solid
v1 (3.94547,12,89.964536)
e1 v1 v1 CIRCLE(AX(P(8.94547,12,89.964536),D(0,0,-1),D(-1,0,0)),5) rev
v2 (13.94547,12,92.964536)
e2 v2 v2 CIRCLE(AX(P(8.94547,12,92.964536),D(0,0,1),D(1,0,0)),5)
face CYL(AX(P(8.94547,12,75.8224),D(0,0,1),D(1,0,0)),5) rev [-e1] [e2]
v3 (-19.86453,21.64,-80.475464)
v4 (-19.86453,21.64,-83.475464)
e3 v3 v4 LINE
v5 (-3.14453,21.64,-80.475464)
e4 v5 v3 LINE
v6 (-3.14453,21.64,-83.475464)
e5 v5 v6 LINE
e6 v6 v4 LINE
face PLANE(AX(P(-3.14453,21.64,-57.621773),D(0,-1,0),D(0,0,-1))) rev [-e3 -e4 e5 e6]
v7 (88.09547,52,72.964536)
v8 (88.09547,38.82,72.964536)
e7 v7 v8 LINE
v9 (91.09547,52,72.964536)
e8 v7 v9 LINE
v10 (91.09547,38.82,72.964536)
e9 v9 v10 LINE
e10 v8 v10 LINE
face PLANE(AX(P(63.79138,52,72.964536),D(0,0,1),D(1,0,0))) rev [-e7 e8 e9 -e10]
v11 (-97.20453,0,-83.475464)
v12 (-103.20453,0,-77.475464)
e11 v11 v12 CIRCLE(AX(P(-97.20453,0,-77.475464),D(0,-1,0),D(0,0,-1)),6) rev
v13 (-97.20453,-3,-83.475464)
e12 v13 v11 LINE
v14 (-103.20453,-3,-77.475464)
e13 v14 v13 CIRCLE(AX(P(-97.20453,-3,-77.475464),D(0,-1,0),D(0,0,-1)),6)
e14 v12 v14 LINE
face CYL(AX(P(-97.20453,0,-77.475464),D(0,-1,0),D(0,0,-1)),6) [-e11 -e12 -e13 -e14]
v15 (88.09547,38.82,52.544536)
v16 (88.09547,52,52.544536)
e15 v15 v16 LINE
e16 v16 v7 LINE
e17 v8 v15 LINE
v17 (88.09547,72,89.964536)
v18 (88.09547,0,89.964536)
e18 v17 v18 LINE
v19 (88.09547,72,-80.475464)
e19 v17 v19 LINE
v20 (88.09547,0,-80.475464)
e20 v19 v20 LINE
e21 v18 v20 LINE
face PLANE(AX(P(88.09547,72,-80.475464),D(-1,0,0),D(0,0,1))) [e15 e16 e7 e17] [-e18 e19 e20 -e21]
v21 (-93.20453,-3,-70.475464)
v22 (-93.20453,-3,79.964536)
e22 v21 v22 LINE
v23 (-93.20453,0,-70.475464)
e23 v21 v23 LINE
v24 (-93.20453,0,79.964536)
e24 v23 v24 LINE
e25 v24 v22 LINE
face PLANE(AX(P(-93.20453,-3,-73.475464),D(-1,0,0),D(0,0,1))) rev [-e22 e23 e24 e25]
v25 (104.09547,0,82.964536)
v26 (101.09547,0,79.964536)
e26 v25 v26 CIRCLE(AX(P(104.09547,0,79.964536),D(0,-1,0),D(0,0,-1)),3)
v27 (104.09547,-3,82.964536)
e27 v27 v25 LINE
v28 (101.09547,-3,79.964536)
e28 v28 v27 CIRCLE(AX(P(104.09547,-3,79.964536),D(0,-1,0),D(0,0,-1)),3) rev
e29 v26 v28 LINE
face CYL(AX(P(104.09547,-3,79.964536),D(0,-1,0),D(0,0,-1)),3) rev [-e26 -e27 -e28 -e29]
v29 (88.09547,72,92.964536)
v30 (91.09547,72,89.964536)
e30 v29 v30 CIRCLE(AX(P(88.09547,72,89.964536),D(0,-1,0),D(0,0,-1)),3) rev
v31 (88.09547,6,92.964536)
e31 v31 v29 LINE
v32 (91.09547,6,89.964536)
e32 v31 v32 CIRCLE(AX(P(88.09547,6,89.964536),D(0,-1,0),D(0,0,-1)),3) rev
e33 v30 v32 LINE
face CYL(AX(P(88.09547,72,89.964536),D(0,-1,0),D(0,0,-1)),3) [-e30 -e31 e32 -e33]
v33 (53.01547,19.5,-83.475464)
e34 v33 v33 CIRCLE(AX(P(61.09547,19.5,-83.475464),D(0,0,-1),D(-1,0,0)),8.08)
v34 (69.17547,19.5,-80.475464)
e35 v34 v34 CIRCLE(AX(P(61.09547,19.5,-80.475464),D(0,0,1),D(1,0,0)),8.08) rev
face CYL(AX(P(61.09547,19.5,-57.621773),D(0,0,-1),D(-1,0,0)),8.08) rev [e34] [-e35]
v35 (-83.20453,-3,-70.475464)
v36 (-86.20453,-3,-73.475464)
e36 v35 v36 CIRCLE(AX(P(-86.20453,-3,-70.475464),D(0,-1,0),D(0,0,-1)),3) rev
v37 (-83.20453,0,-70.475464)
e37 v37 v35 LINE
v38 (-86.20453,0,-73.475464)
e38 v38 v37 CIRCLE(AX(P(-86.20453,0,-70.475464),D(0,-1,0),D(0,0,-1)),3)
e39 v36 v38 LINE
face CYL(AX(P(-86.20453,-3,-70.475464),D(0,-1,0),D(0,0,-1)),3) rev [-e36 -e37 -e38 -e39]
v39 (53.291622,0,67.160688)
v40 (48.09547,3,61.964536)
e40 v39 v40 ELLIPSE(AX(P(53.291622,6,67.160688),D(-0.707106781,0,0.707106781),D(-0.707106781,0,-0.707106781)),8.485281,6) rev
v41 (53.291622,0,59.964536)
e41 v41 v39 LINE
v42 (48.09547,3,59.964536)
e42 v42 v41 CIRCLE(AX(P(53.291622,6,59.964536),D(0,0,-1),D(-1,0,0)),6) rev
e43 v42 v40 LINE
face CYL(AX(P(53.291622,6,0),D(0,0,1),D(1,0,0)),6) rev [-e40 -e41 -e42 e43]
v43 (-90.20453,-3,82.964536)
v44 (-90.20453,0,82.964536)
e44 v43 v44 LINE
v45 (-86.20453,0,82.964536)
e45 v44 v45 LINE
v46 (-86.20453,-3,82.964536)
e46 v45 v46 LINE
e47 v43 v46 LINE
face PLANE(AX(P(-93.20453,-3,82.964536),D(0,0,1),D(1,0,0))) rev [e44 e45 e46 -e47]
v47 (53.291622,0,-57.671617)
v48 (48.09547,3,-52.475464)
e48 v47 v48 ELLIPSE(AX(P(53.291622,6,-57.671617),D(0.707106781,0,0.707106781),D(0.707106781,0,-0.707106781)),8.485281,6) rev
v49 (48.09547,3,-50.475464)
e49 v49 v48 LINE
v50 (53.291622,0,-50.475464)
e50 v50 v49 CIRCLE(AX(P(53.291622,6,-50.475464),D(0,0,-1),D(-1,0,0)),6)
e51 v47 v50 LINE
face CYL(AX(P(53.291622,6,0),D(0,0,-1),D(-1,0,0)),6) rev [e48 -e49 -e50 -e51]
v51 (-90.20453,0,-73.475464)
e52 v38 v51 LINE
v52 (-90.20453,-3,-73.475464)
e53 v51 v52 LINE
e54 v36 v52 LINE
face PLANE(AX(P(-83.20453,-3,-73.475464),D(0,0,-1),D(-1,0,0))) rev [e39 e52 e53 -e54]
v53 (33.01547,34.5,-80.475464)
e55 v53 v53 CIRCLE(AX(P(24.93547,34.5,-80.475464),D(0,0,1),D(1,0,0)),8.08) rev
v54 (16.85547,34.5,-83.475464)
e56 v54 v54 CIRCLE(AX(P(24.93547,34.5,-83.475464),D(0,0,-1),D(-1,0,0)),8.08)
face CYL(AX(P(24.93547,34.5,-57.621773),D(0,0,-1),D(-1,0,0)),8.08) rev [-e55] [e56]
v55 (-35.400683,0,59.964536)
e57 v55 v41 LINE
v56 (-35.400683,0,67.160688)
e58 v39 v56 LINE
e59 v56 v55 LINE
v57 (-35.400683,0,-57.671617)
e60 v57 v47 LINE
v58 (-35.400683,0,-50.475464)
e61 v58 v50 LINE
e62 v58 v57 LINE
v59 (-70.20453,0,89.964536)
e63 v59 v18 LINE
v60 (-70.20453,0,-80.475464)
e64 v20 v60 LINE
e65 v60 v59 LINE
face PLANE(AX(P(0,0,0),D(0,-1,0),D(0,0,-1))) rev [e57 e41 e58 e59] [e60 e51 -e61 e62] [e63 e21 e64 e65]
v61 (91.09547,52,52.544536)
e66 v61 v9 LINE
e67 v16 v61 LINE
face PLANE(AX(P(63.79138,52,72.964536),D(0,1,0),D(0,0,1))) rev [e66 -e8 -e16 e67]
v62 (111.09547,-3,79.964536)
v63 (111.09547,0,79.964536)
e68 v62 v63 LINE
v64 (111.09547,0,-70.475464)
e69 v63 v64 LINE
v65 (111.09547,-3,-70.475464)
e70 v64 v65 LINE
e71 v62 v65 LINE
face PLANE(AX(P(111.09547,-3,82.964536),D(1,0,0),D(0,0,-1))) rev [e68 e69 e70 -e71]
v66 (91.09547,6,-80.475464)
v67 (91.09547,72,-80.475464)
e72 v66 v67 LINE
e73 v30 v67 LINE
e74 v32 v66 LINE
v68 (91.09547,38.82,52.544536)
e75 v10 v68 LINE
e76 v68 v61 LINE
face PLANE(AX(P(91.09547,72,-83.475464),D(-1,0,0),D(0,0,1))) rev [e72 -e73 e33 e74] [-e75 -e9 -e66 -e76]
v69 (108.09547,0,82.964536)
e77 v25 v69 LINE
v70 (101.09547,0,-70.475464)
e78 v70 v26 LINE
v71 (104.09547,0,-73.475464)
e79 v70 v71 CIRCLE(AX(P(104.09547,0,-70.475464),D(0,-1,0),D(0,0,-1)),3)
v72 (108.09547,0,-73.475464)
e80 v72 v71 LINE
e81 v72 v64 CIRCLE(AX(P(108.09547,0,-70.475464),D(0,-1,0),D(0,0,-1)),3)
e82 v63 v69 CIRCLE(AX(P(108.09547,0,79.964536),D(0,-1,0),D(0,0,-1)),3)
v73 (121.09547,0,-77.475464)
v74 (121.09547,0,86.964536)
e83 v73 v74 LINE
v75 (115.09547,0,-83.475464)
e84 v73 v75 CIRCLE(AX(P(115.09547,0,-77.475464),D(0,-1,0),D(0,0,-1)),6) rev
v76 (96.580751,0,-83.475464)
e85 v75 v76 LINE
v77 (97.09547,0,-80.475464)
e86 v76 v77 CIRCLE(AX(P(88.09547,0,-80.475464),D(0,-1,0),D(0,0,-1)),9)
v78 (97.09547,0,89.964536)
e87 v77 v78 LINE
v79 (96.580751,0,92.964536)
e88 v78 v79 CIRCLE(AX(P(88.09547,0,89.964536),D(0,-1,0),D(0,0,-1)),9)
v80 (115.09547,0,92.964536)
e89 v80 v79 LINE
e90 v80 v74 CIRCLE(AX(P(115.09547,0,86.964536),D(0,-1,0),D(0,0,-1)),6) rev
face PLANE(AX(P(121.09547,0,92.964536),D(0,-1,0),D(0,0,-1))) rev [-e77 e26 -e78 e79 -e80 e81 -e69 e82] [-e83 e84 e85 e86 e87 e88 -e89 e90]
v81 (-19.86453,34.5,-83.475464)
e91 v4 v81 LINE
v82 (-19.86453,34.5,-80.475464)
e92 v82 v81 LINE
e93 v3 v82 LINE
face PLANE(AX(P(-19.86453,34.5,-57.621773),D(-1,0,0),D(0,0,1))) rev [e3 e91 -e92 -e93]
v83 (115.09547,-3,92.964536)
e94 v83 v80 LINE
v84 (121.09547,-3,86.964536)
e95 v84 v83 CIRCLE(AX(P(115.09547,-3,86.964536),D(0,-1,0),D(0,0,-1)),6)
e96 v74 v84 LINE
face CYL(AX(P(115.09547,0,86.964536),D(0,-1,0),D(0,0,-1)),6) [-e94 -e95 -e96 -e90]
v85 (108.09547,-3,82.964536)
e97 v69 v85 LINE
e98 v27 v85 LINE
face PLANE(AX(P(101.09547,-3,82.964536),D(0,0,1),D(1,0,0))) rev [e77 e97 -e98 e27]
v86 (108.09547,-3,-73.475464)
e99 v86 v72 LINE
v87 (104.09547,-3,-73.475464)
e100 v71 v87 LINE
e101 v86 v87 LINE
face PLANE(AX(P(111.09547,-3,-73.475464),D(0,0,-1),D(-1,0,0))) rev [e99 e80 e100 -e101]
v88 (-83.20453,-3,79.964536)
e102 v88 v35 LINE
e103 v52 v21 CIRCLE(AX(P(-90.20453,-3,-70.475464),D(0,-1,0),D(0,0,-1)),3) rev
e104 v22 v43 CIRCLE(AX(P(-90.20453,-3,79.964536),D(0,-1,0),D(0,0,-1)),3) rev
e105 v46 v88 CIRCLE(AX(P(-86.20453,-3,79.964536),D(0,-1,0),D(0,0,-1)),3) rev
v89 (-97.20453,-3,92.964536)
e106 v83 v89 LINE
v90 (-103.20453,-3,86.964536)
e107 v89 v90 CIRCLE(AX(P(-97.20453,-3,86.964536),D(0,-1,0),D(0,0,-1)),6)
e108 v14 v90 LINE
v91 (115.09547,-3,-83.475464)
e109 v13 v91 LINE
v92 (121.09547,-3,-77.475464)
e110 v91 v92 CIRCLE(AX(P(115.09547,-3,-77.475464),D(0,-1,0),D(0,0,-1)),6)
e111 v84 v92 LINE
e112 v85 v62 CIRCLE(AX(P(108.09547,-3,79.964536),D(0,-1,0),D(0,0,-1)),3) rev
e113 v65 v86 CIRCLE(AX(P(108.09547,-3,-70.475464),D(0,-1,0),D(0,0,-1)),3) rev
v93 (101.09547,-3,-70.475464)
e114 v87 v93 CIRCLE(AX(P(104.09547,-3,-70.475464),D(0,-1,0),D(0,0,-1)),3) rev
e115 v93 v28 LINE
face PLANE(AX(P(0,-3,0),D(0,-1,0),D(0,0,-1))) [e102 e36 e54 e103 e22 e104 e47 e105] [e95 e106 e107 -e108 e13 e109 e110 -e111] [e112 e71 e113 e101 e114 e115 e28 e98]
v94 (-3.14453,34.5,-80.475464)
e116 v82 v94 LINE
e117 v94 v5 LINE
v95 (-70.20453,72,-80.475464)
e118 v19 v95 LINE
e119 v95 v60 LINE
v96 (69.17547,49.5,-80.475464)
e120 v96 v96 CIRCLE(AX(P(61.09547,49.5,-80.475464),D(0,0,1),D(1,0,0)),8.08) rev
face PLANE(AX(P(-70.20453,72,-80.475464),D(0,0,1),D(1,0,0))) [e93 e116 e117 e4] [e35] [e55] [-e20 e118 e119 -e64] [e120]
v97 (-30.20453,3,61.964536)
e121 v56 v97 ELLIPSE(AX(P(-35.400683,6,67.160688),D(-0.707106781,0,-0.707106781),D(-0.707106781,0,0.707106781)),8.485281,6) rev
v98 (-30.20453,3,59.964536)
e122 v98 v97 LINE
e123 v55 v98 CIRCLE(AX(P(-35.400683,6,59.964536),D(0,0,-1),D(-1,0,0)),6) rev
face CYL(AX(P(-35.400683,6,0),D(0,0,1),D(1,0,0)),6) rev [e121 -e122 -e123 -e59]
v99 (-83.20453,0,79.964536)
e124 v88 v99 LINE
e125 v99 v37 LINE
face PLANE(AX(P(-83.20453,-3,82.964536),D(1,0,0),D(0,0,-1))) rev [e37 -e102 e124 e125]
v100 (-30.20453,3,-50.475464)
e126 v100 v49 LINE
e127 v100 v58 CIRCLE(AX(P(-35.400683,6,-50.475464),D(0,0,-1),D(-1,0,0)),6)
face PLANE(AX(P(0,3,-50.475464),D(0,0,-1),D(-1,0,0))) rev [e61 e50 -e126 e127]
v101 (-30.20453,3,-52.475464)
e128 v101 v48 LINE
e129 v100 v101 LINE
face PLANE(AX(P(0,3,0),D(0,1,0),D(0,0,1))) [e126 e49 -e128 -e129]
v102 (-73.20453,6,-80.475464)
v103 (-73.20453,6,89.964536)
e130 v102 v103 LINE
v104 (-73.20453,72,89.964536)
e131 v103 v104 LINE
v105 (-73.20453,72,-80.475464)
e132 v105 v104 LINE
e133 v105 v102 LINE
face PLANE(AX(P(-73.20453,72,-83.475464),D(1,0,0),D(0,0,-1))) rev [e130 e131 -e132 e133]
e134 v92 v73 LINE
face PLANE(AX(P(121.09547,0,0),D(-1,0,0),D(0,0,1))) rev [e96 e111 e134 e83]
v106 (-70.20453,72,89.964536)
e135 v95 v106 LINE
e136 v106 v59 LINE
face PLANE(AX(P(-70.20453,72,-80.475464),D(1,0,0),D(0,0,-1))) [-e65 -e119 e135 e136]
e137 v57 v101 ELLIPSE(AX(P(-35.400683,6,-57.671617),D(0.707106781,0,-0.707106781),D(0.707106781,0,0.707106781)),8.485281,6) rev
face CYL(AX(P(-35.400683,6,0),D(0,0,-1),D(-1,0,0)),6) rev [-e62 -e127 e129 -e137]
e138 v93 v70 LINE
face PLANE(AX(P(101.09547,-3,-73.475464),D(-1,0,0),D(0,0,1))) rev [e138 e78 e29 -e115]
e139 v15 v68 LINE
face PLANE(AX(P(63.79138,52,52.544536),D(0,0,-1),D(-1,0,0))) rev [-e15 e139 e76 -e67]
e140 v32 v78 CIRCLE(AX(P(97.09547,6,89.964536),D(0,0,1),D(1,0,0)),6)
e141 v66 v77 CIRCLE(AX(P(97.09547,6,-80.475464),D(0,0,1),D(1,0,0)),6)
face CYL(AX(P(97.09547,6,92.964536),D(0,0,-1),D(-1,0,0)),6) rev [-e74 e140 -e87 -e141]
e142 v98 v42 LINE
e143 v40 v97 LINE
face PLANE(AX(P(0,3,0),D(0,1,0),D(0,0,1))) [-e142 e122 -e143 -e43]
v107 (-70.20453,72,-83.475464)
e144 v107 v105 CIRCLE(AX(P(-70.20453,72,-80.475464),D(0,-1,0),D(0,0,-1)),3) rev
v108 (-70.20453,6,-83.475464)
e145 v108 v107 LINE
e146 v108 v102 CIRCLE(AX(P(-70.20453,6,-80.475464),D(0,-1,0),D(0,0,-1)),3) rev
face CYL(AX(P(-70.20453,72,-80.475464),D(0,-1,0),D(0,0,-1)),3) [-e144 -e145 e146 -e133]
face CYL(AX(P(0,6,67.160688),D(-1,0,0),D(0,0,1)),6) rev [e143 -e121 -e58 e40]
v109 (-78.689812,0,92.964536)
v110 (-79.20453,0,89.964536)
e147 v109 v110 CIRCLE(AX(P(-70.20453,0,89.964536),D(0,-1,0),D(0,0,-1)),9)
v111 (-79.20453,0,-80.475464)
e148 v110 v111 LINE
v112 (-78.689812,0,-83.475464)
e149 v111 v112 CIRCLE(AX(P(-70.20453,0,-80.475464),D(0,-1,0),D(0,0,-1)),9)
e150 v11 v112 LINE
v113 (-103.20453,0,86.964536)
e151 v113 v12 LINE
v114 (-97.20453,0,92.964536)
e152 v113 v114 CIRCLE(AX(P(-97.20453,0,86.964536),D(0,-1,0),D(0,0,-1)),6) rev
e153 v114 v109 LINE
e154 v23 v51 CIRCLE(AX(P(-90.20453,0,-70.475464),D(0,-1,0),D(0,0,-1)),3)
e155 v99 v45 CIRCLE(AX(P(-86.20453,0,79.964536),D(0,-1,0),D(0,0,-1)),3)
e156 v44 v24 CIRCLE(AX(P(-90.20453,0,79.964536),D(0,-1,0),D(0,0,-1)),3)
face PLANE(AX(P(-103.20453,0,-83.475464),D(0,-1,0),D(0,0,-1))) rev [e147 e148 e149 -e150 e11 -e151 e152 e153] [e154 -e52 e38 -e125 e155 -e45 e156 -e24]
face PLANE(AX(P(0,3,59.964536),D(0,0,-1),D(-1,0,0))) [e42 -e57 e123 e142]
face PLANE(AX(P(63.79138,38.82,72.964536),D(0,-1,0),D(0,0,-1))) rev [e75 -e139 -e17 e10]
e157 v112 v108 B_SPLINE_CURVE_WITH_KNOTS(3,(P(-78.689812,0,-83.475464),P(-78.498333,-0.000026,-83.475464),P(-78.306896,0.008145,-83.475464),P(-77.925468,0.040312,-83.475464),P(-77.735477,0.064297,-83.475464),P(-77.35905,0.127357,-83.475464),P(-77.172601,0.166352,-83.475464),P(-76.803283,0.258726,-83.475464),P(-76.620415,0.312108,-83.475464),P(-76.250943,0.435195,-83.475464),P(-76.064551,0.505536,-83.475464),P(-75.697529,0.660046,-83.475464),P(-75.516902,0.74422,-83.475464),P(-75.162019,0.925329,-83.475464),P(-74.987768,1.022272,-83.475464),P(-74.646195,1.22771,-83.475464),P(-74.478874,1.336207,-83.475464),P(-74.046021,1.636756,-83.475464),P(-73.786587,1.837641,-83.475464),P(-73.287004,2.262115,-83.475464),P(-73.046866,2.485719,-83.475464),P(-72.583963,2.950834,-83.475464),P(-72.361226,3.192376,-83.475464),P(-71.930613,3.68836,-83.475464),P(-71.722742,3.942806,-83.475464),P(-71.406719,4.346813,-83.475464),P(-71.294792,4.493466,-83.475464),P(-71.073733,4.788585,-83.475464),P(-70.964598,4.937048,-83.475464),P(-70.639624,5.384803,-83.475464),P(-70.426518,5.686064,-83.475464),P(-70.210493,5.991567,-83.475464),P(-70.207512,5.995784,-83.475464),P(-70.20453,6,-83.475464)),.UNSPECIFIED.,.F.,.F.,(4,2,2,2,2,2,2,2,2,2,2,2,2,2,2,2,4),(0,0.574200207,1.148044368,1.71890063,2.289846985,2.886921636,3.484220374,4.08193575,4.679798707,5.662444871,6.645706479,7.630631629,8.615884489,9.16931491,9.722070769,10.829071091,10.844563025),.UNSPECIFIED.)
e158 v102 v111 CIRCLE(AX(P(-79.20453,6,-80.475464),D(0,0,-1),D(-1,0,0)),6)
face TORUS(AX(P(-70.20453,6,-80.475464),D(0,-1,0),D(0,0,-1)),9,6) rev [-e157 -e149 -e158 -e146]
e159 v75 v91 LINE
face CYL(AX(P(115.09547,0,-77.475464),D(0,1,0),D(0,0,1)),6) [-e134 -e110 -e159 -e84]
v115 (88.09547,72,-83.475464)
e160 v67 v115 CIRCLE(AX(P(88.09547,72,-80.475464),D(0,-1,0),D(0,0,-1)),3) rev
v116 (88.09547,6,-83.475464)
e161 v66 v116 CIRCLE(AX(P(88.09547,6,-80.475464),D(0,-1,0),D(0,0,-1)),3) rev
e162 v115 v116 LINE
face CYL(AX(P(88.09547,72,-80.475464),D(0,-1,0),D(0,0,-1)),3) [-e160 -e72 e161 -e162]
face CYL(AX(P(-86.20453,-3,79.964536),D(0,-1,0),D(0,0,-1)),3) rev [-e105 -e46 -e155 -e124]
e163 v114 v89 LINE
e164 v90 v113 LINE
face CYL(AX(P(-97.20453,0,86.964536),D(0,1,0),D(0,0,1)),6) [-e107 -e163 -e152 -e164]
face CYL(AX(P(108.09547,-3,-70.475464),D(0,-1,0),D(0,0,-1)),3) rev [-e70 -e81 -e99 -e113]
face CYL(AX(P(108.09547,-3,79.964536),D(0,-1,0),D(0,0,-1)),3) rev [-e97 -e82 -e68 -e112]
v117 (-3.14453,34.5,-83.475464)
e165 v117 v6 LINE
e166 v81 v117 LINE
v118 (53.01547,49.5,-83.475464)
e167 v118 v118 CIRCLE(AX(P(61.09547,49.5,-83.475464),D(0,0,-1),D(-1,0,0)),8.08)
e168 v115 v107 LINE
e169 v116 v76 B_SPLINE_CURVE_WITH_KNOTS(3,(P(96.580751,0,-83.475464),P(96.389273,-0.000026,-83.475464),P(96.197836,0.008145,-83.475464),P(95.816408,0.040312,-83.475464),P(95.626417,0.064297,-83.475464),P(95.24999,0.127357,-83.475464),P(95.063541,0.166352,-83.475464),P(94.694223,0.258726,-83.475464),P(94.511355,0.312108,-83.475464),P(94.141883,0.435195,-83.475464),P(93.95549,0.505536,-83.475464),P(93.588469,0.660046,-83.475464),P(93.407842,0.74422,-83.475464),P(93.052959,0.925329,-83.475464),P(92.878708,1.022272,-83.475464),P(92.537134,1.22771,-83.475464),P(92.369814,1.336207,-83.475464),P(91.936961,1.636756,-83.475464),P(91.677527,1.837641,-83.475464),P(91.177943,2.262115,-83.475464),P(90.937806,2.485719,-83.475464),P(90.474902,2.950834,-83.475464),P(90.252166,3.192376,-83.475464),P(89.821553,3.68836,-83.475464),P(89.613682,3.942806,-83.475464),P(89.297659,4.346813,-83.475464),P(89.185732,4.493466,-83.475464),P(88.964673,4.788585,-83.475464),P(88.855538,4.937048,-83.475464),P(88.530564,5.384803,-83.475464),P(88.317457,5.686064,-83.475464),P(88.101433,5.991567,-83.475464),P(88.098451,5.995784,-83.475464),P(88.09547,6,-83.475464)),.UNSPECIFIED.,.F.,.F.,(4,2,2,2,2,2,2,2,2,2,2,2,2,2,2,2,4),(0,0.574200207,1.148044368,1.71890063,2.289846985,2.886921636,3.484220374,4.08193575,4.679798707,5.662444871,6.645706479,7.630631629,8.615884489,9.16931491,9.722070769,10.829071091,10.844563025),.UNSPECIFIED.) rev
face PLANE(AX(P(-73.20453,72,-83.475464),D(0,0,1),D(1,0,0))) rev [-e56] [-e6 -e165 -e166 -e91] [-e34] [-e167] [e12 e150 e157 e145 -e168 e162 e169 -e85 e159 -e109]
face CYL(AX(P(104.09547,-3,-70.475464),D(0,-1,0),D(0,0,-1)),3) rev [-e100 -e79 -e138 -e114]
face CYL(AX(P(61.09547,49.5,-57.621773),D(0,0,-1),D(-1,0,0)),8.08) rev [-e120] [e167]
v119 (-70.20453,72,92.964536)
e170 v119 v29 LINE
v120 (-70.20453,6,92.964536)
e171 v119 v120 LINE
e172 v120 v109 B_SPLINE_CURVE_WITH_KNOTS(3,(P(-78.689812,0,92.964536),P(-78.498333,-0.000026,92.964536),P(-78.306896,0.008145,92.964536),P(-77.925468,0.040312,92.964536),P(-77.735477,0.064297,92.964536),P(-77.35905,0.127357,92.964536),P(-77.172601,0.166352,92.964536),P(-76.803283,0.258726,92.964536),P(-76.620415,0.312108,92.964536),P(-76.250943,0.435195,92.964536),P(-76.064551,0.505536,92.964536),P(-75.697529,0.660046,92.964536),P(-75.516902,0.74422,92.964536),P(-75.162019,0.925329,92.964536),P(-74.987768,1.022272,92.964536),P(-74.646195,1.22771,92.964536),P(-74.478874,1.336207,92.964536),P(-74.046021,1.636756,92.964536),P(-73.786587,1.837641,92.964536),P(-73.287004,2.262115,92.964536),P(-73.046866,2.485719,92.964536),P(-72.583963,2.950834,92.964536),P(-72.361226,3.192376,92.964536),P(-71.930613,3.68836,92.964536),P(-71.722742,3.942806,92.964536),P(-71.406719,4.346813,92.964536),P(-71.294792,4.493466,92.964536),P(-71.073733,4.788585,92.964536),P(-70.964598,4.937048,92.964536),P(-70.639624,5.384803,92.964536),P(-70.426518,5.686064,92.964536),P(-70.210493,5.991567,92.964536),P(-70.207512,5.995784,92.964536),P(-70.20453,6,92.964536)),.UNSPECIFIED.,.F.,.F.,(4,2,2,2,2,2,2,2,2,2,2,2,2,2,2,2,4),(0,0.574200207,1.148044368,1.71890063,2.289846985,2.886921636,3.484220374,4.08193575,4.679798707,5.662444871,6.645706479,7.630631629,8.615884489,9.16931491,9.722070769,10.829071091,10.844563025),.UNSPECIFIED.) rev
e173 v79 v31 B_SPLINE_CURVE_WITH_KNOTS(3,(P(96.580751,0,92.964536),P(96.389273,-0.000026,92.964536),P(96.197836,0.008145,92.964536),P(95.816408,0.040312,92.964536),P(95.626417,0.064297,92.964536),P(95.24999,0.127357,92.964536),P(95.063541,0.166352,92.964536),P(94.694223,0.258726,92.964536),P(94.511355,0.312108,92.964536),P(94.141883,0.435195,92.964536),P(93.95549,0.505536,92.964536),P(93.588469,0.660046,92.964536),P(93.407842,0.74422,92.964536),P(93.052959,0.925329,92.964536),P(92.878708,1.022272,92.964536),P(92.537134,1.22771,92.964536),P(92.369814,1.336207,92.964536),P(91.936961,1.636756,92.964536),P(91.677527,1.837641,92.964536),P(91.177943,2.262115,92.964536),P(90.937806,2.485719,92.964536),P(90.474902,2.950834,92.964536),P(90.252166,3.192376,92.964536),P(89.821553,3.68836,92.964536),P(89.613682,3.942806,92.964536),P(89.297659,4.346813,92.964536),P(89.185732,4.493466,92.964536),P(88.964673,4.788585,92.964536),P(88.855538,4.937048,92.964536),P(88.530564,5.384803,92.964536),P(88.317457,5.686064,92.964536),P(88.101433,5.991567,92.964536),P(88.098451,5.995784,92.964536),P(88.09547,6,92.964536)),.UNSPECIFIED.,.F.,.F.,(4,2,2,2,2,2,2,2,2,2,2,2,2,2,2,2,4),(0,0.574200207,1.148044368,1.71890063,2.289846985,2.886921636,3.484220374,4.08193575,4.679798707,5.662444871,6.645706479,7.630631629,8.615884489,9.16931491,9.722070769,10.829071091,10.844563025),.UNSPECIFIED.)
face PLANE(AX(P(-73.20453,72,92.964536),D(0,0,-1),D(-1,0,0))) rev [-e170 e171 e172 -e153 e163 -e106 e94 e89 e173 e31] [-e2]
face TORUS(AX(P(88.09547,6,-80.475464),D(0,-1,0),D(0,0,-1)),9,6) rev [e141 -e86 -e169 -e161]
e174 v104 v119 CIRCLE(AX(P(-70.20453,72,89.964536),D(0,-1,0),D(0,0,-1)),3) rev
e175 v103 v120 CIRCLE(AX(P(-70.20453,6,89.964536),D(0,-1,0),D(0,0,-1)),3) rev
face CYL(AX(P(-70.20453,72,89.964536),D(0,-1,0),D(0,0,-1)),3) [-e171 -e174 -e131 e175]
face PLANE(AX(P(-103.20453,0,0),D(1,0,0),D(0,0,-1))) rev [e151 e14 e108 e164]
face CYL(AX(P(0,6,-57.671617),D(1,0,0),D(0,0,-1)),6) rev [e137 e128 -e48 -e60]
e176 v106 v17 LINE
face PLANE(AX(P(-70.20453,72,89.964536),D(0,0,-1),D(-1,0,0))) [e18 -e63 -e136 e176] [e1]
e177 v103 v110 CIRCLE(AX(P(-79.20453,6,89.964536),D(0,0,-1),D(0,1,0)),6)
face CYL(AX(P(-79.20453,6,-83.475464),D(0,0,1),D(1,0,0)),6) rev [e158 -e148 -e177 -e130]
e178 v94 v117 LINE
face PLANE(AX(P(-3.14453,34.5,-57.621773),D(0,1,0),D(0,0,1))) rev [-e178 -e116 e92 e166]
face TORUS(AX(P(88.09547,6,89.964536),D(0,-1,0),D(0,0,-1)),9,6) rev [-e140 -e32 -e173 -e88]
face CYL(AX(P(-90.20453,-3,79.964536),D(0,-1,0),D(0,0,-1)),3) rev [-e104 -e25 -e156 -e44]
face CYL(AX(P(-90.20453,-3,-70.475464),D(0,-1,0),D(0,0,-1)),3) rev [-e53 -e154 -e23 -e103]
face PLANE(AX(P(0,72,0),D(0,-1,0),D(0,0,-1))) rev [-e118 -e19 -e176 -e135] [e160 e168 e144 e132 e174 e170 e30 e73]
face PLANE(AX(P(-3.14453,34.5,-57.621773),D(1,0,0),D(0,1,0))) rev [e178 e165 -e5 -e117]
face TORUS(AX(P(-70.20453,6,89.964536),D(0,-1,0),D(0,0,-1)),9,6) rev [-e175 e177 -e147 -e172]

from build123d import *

# Parameters (mm, degrees)
SKETCH1_W           = 164.3
SKETCH1_H           = 176.44
SKETCH1_W_2         = 158.3
SKETCH1_H_2         = 170.44
BOSS_EXTRUDE1_DEPTH = 72
SKETCH2_W           = 164.3
SKETCH2_H           = 176.44
BOSS_EXTRUDE2_DEPTH = 3
SKETCH3_R           = 8.08
SKETCH3_W           = 16.72
SKETCH3_H           = 12.86
CUT_EXTRUDE1_DEPTH  = 3
SKETCH4_W           = 20.42
SKETCH4_H           = 13.18
CUT_EXTRUDE2_DEPTH  = 3
SKETCH5_R           = 5
CUT_EXTRUDE3_DEPTH  = 3
SKETCH6_W           = 176.44
SKETCH6_H           = 3
BOSS_EXTRUDE3_DEPTH = 30
SKETCH7_W           = 176.44
SKETCH7_H           = 3
BOSS_EXTRUDE4_DEPTH = 30
SKETCH9_W           = 10
SKETCH9_H           = 156.44
CUT_EXTRUDE4_DEPTH  = 169.791343641
SKETCH10_W          = 10
SKETCH10_H          = 156.44
CUT_EXTRUDE5_DEPTH  = 169.791343641
FILLET1_R           = 3
FILLET2_R           = 6
SKETCH11_W          = 78.3
SKETCH11_H          = 2
BOSS_EXTRUDE5_DEPTH = 3
FILLET3_R           = 6


with BuildPart() as part:
    # Sketch1 → Boss-Extrude1 (new body)
    with BuildSketch(Plane(origin=(0, 0, 0), x_dir=(1, 0, 0), z_dir=(0, 1, 0))):
        with Locations((8.94546986, -4.744535538)):
            Rectangle(SKETCH1_W, SKETCH1_H)
        with Locations((8.94546986, -4.744535538)):
            Rectangle(SKETCH1_W_2, SKETCH1_H_2, mode=Mode.SUBTRACT)
    extrude(amount=BOSS_EXTRUDE1_DEPTH)

    # Sketch2 → Boss-Extrude2 (add)
    with BuildSketch(Plane.XZ):
        with Locations((8.94546986, 4.744535538)):
            Rectangle(SKETCH2_W, SKETCH2_H)
    extrude(amount=BOSS_EXTRUDE2_DEPTH)

    # Sketch3 → Cut-Extrude1 (cut)
    with BuildSketch(Plane(origin=(0, 0, -83.475464462), x_dir=(-1, 0, 0), z_dir=(0, 0, -1))):
        with Locations((-61.09546986, 49.5)):
            Circle(SKETCH3_R)
        with Locations((-61.09546986, 19.5)):
            Circle(SKETCH3_R)
        with Locations((-24.93546986, 34.5)):
            Circle(SKETCH3_R)
        with Locations((11.50453014, 28.07)):
            Rectangle(SKETCH3_W, SKETCH3_H)
    extrude(amount=-CUT_EXTRUDE1_DEPTH, mode=Mode.SUBTRACT)

    # Sketch4 → Cut-Extrude2 (cut)
    with BuildSketch(Plane(origin=(91.09546986, 0, 0), x_dir=(0, 0, -1), z_dir=(1, 0, 0))):
        with Locations((-62.754535538, 45.41)):
            Rectangle(SKETCH4_W, SKETCH4_H)
    extrude(amount=-CUT_EXTRUDE2_DEPTH, mode=Mode.SUBTRACT)

    # Sketch5 → Cut-Extrude3 (cut)
    with BuildSketch(Plane.XY.offset(92.964535538)):
        with Locations((8.94546986, 12)):
            Circle(SKETCH5_R)
    extrude(amount=-CUT_EXTRUDE3_DEPTH, mode=Mode.SUBTRACT)

    # Sketch6 → Boss-Extrude3 (add)
    with BuildSketch(Plane.ZY.offset(73.20453014)):
        with Locations((4.744535538, -1.5)):
            Rectangle(SKETCH6_W, SKETCH6_H)
    extrude(amount=BOSS_EXTRUDE3_DEPTH)

    # Sketch7 → Boss-Extrude4 (add)
    with BuildSketch(Plane(origin=(91.09546986, 0, 0), x_dir=(0, 0, -1), z_dir=(1, 0, 0))):
        with Locations((-4.744535538, -1.5)):
            Rectangle(SKETCH7_W, SKETCH7_H)
    extrude(amount=BOSS_EXTRUDE4_DEPTH)

    # Sketch9 → Cut-Extrude4 (cut, through all)
    with BuildSketch(Plane(origin=(0, 0, 0), x_dir=(1, 0, 0), z_dir=(0, 1, 0))):
        with Locations((-88.20453014, -4.744535538)):
            Rectangle(SKETCH9_W, SKETCH9_H)
    extrude(amount=-CUT_EXTRUDE4_DEPTH, mode=Mode.SUBTRACT)

    # Sketch10 → Cut-Extrude5 (cut, through all)
    with BuildSketch(Plane(origin=(0, 0, 0), x_dir=(1, 0, 0), z_dir=(0, 1, 0))):
        with Locations((106.09546986, -4.744535538)):
            Rectangle(SKETCH10_W, SKETCH10_H)
    extrude(amount=-CUT_EXTRUDE5_DEPTH, mode=Mode.SUBTRACT)

    # Fillet1
    fillet1_edges = [part.edges().sort_by_distance(p)[0] for p in [
        (-83.20453014, -1.5, 82.964535538),
        (-93.20453014, -1.5, 82.964535538),
        (-93.20453014, -1.5, -73.475464462),
        (-83.20453014, -1.5, -73.475464462),
        (101.09546986, -1.5, -73.475464462),
        (111.09546986, -1.5, -73.475464462),
        (111.09546986, -1.5, 82.964535538),
        (101.09546986, -1.5, 82.964535538),
        (91.09546986, 36, -83.475464462),
        (91.09546986, 36, 92.964535538),
        (-73.20453014, 36, 92.964535538),
        (-73.20453014, 36, -83.475464462),
    ]]
    fillet(fillet1_edges, radius=FILLET1_R)

    # Fillet2
    # the kernel refuses this fillet: 6 mm, written as the material it adds along each edge
    with BuildSketch(Plane(origin=(-73.20453014, 0, 89.964535538), x_dir=(0, 1, 0), z_dir=(0, 0, -1)), Plane(origin=(91.09546986, 0, -80.475464462), x_dir=(0, 1, 0), z_dir=(0, 0, 1))) as fillet2_piece_1:
        with BuildLine():
            CenterArc((FILLET2_R, -FILLET2_R), FILLET2_R, 90, 90)
            Line((0, -FILLET2_R), (0, 0))
            Line((0, 0), (FILLET2_R, 0))
        make_face()
    extrude(amount=170.44)
    with BuildSketch(Plane(origin=(-70.20453014, 0, 89.964535538), x_dir=(-1, 0, 0), z_dir=(0, 0, -1))) as fillet2_piece_2_section:
        with BuildLine():
            CenterArc((3 + FILLET2_R, FILLET2_R), FILLET2_R, 180, 90)
            Line((3 + FILLET2_R, 0), (3, 0))
            Line((3, 0), (3, FILLET2_R))
        make_face()
    fillet2_piece_2 = revolve(axis=Axis((-70.20453014, 0, 89.964535538), (0, 1, 0)), revolution_arc=90, mode=Mode.PRIVATE)
    fillet2_piece_2 = split(fillet2_piece_2, bisect_by=Plane(origin=(-72.485257405, 2.132983428, 92.964535538), z_dir=(0, 0, -1)), keep=Keep.TOP, mode=Mode.PRIVATE)
    add(fillet2_piece_2)
    with BuildSketch(Plane(origin=(88.09546986, 0, 89.964535538), x_dir=(0, 0, 1), z_dir=(-1, 0, 0))) as fillet2_piece_3_section:
        with BuildLine():
            CenterArc((3 + FILLET2_R, FILLET2_R), FILLET2_R, 180, 90)
            Line((3, FILLET2_R), (3, 0))
            Line((3, 0), (3 + FILLET2_R, 0))
        make_face()
    fillet2_piece_3 = revolve(axis=Axis((88.09546986, 0, 89.964535538), (0, 1, 0)), revolution_arc=90, mode=Mode.PRIVATE)
    fillet2_piece_3 = split(fillet2_piece_3, bisect_by=Plane(origin=(90.376197118, 2.132983428, 92.964535538), z_dir=(0, 0, -1)), keep=Keep.TOP, mode=Mode.PRIVATE)
    add(fillet2_piece_3)
    with BuildSketch(Plane(origin=(88.09546986, 0, -80.475464462), x_dir=(0, 0, -1), z_dir=(-1, 0, 0))) as fillet2_piece_4_section:
        with BuildLine():
            CenterArc((3 + FILLET2_R, -FILLET2_R), FILLET2_R, 90, 90)
            Line((3, -FILLET2_R), (3, 0))
            Line((3, 0), (3 + FILLET2_R, 0))
        make_face()
    fillet2_piece_4 = revolve(axis=Axis((88.09546986, 0, -80.475464462), (0, -1, 0)), revolution_arc=90, mode=Mode.PRIVATE)
    fillet2_piece_4 = split(fillet2_piece_4, bisect_by=Plane(origin=(90.376233662, 2.13290724, -83.475464462), z_dir=(0, 0, 1)), keep=Keep.TOP, mode=Mode.PRIVATE)
    add(fillet2_piece_4)
    with BuildSketch(Plane(origin=(-70.20453014, 0, -80.475464462), x_dir=(-1, 0, 0), z_dir=(0, 0, 1))) as fillet2_piece_5_section:
        with BuildLine():
            CenterArc((3 + FILLET2_R, -FILLET2_R), FILLET2_R, 90, 90)
            Line((3 + FILLET2_R, 0), (3, 0))
            Line((3, 0), (3, -FILLET2_R))
        make_face()
    fillet2_piece_5 = revolve(axis=Axis((-70.20453014, 0, -80.475464462), (0, -1, 0)), revolution_arc=90, mode=Mode.PRIVATE)
    fillet2_piece_5 = split(fillet2_piece_5, bisect_by=Plane(origin=(-72.485257393, 2.132983423, -83.475464462), z_dir=(0, 0, 1)), keep=Keep.TOP, mode=Mode.PRIVATE)
    add(fillet2_piece_5)
    # the kernel refuses this fillet: 6 mm, written as the material it takes off along each edge
    with BuildSketch(Plane(origin=(121.09546986, 15, 92.964535538), x_dir=(-1, 0, 0), z_dir=(0, -1, 0)), Plane(origin=(121.09546986, -18, -83.475464462), x_dir=(-1, 0, 0), z_dir=(0, 1, 0)), Plane(origin=(-103.20453014, 15, -83.475464462), x_dir=(1, 0, 0), z_dir=(0, -1, 0)), Plane(origin=(-103.20453014, -18, 92.964535538), x_dir=(1, 0, 0), z_dir=(0, 1, 0))) as fillet2_2_piece_1:
        with BuildLine():
            CenterArc((FILLET2_R, FILLET2_R), FILLET2_R, 180, 90)
            Line((0, FILLET2_R), (0, 0))
            Line((0, 0), (FILLET2_R, 0))
        make_face()
    extrude(amount=33, mode=Mode.SUBTRACT)

    # Sketch11 → Boss-Extrude5 (add)
    with BuildSketch(Plane(origin=(0, 0, 0), x_dir=(1, 0, 0), z_dir=(0, 1, 0))):
        with Locations((8.94546986, 51.475464462)):
            Rectangle(SKETCH11_W, SKETCH11_H)
        with Locations((8.94546986, -60.964535538)):
            Rectangle(SKETCH11_W, SKETCH11_H)
    extrude(amount=BOSS_EXTRUDE5_DEPTH)

    # Fillet3
    # the kernel refuses this fillet: 6 mm, written as the material it adds along each edge
    with BuildSketch(Plane(origin=(48.09546986, 0, 61.964535538), x_dir=(0, 0, 1), z_dir=(-1, 0, 0))) as fillet3_piece_1:
        with BuildLine():
            CenterArc((5.196152423, 6), FILLET3_R, 210, 60)
            Line((0, 3), (-0.103923048, 2.94))
            ThreePointArc((-0.103923048, 2.94), (-0.12, 1.5), (-0.12, 0))
            Line((-0.12, 0), (0, -0.12))
            Line((0, -0.12), (5.196152423, -0.12))
            Line((5.196152423, -0.12), (5.196152423, 0))
        make_face()
    extrude(amount=78.3)
    with BuildSketch(Plane(origin=(48.09546986, 0, -52.475464462), x_dir=(0, 0, -1), z_dir=(-1, 0, 0))) as fillet3_piece_2:
        with BuildLine():
            CenterArc((5.196152423, -6), FILLET3_R, 90, 60)
            Line((0, -3), (-0.103923048, -2.94))
            ThreePointArc((-0.103923048, -2.94), (-0.12, -1.5), (-0.12, 0))
            Line((-0.12, 0), (0, 0.12))
            Line((0, 0.12), (5.196152423, 0.12))
            Line((5.196152423, 0.12), (5.196152423, 0))
        make_face()
    extrude(amount=78.3)
    with BuildSketch(Plane(origin=(-30.20453014, 0, 61.964535538), x_dir=(-1, 0, 0), z_dir=(0, 0, -1)), Plane(origin=(48.09546986, 0, 59.964535538), x_dir=(1, 0, 0), z_dir=(0, 0, 1))) as fillet3_piece_3:
        with BuildLine():
            CenterArc((5.196152423, 6), FILLET3_R, 210, 60)
            Line((0, 3), (-0.103923048, 2.94))
            ThreePointArc((-0.103923048, 2.94), (-0.12, 1.5), (-0.12, 0))
            Line((-0.12, 0), (0, -0.12))
            Line((0, -0.12), (5.196152423, -0.12))
            Line((5.196152423, -0.12), (5.196152423, 0))
        make_face()
    extrude(amount=2)
    with BuildSketch(Plane(origin=(48.09546986, 0, -50.475464462), x_dir=(1, 0, 0), z_dir=(0, 0, -1)), Plane(origin=(-30.20453014, 0, -52.475464462), x_dir=(-1, 0, 0), z_dir=(0, 0, 1))) as fillet3_piece_4:
        with BuildLine():
            CenterArc((5.196152423, -6), FILLET3_R, 90, 60)
            Line((0, -3), (-0.103923048, -2.94))
            ThreePointArc((-0.103923048, -2.94), (-0.12, -1.5), (-0.12, 0))
            Line((-0.12, 0), (0, 0.12))
            Line((0, 0.12), (5.196152423, 0.12))
            Line((5.196152423, 0.12), (5.196152423, 0))
        make_face()
    extrude(amount=2)
    with BuildSketch(Plane(origin=(48.09546986, 0, 59.964535538), x_dir=(1, 0, 0), z_dir=(0, 0, 1))) as fillet3_piece_5a_section:
        with BuildLine():
            CenterArc((5.196152423, 6), FILLET3_R, 210, 60)
            Line((0, 3), (-0.103923048, 2.94))
            ThreePointArc((-0.103923048, 2.94), (-0.12, 1.5), (-0.12, 0))
            Line((-0.12, 0), (0, -0.12))
            Line((0, -0.12), (5.196152423, -0.12))
            Line((5.196152423, -0.12), (5.196152423, 0))
        make_face()
    fillet3_piece_5a = extrude(amount=14.990381057, mode=Mode.PRIVATE)
    fillet3_piece_5a = split(fillet3_piece_5a, bisect_by=Plane(origin=(49.393332535, 0.777100266, 61.964535538), z_dir=(0, 0, 1)), keep=Keep.TOP, mode=Mode.PRIVATE)
    with BuildSketch(Plane(origin=(61.085850916, 0, 61.964535538), x_dir=(0, 0, 1), z_dir=(-1, 0, 0))) as fillet3_piece_5b_section:
        with BuildLine():
            CenterArc((5.196152423, 6), FILLET3_R, 210, 60)
            Line((0, 3), (-0.103923048, 2.94))
            ThreePointArc((-0.103923048, 2.94), (-0.12, 1.5), (-0.12, 0))
            Line((-0.12, 0), (0, -0.12))
            Line((0, -0.12), (5.196152423, -0.12))
            Line((5.196152423, -0.12), (5.196152423, 0))
        make_face()
    fillet3_piece_5b = extrude(amount=91.290381057, mode=Mode.PRIVATE)
    fillet3_piece_5b = split(fillet3_piece_5b, bisect_by=Plane(origin=(48.09546986, 0.777100266, 63.262398213), z_dir=(1, 0, 0)), keep=Keep.TOP, mode=Mode.PRIVATE)
    fillet3_piece_5 = fillet3_piece_5a & fillet3_piece_5b
    add(fillet3_piece_5)
    with BuildSketch(Plane(origin=(48.09546986, 0, 61.964535538), x_dir=(0, 0, 1), z_dir=(-1, 0, 0))) as fillet3_piece_6a_section:
        with BuildLine():
            CenterArc((5.196152423, 6), FILLET3_R, 210, 60)
            Line((0, 3), (-0.103923048, 2.94))
            ThreePointArc((-0.103923048, 2.94), (-0.12, 1.5), (-0.12, 0))
            Line((-0.12, 0), (0, -0.12))
            Line((0, -0.12), (5.196152423, -0.12))
            Line((5.196152423, -0.12), (5.196152423, 0))
        make_face()
    fillet3_piece_6a = extrude(amount=91.290381057, mode=Mode.PRIVATE)
    fillet3_piece_6a = split(fillet3_piece_6a, bisect_by=Plane(origin=(-30.20453014, 0.777100266, 63.262398213), z_dir=(-1, 0, 0)), keep=Keep.TOP, mode=Mode.PRIVATE)
    with BuildSketch(Plane(origin=(-30.20453014, 0, 74.954916594), x_dir=(-1, 0, 0), z_dir=(0, 0, -1))) as fillet3_piece_6b_section:
        with BuildLine():
            CenterArc((5.196152423, 6), FILLET3_R, 210, 60)
            Line((0, 3), (-0.103923048, 2.94))
            ThreePointArc((-0.103923048, 2.94), (-0.12, 1.5), (-0.12, 0))
            Line((-0.12, 0), (0, -0.12))
            Line((0, -0.12), (5.196152423, -0.12))
            Line((5.196152423, -0.12), (5.196152423, 0))
        make_face()
    fillet3_piece_6b = extrude(amount=14.990381057, mode=Mode.PRIVATE)
    fillet3_piece_6b = split(fillet3_piece_6b, bisect_by=Plane(origin=(-31.502392815, 0.777100266, 61.964535538), z_dir=(0, 0, 1)), keep=Keep.TOP, mode=Mode.PRIVATE)
    fillet3_piece_6 = fillet3_piece_6a & fillet3_piece_6b
    add(fillet3_piece_6)
    with BuildSketch(Plane(origin=(61.085850916, 0, -52.475464462), x_dir=(0, 0, -1), z_dir=(-1, 0, 0))) as fillet3_piece_7a_section:
        with BuildLine():
            CenterArc((5.196152423, -6), FILLET3_R, 90, 60)
            Line((0, -3), (-0.103923048, -2.94))
            ThreePointArc((-0.103923048, -2.94), (-0.12, -1.5), (-0.12, 0))
            Line((-0.12, 0), (0, 0.12))
            Line((0, 0.12), (5.196152423, 0.12))
            Line((5.196152423, 0.12), (5.196152423, 0))
        make_face()
    fillet3_piece_7a = extrude(amount=91.290381057, mode=Mode.PRIVATE)
    fillet3_piece_7a = split(fillet3_piece_7a, bisect_by=Plane(origin=(48.09546986, 0.777100266, -53.773327137), z_dir=(1, 0, 0)), keep=Keep.TOP, mode=Mode.PRIVATE)
    with BuildSketch(Plane(origin=(48.09546986, 0, -50.475464462), x_dir=(1, 0, 0), z_dir=(0, 0, -1))) as fillet3_piece_7b_section:
        with BuildLine():
            CenterArc((5.196152423, -6), FILLET3_R, 90, 60)
            Line((0, -3), (-0.103923048, -2.94))
            ThreePointArc((-0.103923048, -2.94), (-0.12, -1.5), (-0.12, 0))
            Line((-0.12, 0), (0, 0.12))
            Line((0, 0.12), (5.196152423, 0.12))
            Line((5.196152423, 0.12), (5.196152423, 0))
        make_face()
    fillet3_piece_7b = extrude(amount=14.990381057, mode=Mode.PRIVATE)
    fillet3_piece_7b = split(fillet3_piece_7b, bisect_by=Plane(origin=(49.393332535, 0.777100266, -52.475464462), z_dir=(0, 0, -1)), keep=Keep.TOP, mode=Mode.PRIVATE)
    fillet3_piece_7 = fillet3_piece_7a & fillet3_piece_7b
    add(fillet3_piece_7)
    with BuildSketch(Plane(origin=(-30.20453014, 0, -65.465845519), x_dir=(-1, 0, 0), z_dir=(0, 0, 1))) as fillet3_piece_8a_section:
        with BuildLine():
            CenterArc((5.196152423, -6), FILLET3_R, 90, 60)
            Line((0, -3), (-0.103923048, -2.94))
            ThreePointArc((-0.103923048, -2.94), (-0.12, -1.5), (-0.12, 0))
            Line((-0.12, 0), (0, 0.12))
            Line((0, 0.12), (5.196152423, 0.12))
            Line((5.196152423, 0.12), (5.196152423, 0))
        make_face()
    fillet3_piece_8a = extrude(amount=14.990381057, mode=Mode.PRIVATE)
    fillet3_piece_8a = split(fillet3_piece_8a, bisect_by=Plane(origin=(-31.502392815, 0.777100266, -52.475464462), z_dir=(0, 0, -1)), keep=Keep.TOP, mode=Mode.PRIVATE)
    with BuildSketch(Plane(origin=(48.09546986, 0, -52.475464462), x_dir=(0, 0, -1), z_dir=(-1, 0, 0))) as fillet3_piece_8b_section:
        with BuildLine():
            CenterArc((5.196152423, -6), FILLET3_R, 90, 60)
            Line((0, -3), (-0.103923048, -2.94))
            ThreePointArc((-0.103923048, -2.94), (-0.12, -1.5), (-0.12, 0))
            Line((-0.12, 0), (0, 0.12))
            Line((0, 0.12), (5.196152423, 0.12))
            Line((5.196152423, 0.12), (5.196152423, 0))
        make_face()
    fillet3_piece_8b = extrude(amount=91.290381057, mode=Mode.PRIVATE)
    fillet3_piece_8b = split(fillet3_piece_8b, bisect_by=Plane(origin=(-30.20453014, 0.777100266, -53.773327137), z_dir=(-1, 0, 0)), keep=Keep.TOP, mode=Mode.PRIVATE)
    fillet3_piece_8 = fillet3_piece_8a & fillet3_piece_8b
    add(fillet3_piece_8)


solid = part.part
